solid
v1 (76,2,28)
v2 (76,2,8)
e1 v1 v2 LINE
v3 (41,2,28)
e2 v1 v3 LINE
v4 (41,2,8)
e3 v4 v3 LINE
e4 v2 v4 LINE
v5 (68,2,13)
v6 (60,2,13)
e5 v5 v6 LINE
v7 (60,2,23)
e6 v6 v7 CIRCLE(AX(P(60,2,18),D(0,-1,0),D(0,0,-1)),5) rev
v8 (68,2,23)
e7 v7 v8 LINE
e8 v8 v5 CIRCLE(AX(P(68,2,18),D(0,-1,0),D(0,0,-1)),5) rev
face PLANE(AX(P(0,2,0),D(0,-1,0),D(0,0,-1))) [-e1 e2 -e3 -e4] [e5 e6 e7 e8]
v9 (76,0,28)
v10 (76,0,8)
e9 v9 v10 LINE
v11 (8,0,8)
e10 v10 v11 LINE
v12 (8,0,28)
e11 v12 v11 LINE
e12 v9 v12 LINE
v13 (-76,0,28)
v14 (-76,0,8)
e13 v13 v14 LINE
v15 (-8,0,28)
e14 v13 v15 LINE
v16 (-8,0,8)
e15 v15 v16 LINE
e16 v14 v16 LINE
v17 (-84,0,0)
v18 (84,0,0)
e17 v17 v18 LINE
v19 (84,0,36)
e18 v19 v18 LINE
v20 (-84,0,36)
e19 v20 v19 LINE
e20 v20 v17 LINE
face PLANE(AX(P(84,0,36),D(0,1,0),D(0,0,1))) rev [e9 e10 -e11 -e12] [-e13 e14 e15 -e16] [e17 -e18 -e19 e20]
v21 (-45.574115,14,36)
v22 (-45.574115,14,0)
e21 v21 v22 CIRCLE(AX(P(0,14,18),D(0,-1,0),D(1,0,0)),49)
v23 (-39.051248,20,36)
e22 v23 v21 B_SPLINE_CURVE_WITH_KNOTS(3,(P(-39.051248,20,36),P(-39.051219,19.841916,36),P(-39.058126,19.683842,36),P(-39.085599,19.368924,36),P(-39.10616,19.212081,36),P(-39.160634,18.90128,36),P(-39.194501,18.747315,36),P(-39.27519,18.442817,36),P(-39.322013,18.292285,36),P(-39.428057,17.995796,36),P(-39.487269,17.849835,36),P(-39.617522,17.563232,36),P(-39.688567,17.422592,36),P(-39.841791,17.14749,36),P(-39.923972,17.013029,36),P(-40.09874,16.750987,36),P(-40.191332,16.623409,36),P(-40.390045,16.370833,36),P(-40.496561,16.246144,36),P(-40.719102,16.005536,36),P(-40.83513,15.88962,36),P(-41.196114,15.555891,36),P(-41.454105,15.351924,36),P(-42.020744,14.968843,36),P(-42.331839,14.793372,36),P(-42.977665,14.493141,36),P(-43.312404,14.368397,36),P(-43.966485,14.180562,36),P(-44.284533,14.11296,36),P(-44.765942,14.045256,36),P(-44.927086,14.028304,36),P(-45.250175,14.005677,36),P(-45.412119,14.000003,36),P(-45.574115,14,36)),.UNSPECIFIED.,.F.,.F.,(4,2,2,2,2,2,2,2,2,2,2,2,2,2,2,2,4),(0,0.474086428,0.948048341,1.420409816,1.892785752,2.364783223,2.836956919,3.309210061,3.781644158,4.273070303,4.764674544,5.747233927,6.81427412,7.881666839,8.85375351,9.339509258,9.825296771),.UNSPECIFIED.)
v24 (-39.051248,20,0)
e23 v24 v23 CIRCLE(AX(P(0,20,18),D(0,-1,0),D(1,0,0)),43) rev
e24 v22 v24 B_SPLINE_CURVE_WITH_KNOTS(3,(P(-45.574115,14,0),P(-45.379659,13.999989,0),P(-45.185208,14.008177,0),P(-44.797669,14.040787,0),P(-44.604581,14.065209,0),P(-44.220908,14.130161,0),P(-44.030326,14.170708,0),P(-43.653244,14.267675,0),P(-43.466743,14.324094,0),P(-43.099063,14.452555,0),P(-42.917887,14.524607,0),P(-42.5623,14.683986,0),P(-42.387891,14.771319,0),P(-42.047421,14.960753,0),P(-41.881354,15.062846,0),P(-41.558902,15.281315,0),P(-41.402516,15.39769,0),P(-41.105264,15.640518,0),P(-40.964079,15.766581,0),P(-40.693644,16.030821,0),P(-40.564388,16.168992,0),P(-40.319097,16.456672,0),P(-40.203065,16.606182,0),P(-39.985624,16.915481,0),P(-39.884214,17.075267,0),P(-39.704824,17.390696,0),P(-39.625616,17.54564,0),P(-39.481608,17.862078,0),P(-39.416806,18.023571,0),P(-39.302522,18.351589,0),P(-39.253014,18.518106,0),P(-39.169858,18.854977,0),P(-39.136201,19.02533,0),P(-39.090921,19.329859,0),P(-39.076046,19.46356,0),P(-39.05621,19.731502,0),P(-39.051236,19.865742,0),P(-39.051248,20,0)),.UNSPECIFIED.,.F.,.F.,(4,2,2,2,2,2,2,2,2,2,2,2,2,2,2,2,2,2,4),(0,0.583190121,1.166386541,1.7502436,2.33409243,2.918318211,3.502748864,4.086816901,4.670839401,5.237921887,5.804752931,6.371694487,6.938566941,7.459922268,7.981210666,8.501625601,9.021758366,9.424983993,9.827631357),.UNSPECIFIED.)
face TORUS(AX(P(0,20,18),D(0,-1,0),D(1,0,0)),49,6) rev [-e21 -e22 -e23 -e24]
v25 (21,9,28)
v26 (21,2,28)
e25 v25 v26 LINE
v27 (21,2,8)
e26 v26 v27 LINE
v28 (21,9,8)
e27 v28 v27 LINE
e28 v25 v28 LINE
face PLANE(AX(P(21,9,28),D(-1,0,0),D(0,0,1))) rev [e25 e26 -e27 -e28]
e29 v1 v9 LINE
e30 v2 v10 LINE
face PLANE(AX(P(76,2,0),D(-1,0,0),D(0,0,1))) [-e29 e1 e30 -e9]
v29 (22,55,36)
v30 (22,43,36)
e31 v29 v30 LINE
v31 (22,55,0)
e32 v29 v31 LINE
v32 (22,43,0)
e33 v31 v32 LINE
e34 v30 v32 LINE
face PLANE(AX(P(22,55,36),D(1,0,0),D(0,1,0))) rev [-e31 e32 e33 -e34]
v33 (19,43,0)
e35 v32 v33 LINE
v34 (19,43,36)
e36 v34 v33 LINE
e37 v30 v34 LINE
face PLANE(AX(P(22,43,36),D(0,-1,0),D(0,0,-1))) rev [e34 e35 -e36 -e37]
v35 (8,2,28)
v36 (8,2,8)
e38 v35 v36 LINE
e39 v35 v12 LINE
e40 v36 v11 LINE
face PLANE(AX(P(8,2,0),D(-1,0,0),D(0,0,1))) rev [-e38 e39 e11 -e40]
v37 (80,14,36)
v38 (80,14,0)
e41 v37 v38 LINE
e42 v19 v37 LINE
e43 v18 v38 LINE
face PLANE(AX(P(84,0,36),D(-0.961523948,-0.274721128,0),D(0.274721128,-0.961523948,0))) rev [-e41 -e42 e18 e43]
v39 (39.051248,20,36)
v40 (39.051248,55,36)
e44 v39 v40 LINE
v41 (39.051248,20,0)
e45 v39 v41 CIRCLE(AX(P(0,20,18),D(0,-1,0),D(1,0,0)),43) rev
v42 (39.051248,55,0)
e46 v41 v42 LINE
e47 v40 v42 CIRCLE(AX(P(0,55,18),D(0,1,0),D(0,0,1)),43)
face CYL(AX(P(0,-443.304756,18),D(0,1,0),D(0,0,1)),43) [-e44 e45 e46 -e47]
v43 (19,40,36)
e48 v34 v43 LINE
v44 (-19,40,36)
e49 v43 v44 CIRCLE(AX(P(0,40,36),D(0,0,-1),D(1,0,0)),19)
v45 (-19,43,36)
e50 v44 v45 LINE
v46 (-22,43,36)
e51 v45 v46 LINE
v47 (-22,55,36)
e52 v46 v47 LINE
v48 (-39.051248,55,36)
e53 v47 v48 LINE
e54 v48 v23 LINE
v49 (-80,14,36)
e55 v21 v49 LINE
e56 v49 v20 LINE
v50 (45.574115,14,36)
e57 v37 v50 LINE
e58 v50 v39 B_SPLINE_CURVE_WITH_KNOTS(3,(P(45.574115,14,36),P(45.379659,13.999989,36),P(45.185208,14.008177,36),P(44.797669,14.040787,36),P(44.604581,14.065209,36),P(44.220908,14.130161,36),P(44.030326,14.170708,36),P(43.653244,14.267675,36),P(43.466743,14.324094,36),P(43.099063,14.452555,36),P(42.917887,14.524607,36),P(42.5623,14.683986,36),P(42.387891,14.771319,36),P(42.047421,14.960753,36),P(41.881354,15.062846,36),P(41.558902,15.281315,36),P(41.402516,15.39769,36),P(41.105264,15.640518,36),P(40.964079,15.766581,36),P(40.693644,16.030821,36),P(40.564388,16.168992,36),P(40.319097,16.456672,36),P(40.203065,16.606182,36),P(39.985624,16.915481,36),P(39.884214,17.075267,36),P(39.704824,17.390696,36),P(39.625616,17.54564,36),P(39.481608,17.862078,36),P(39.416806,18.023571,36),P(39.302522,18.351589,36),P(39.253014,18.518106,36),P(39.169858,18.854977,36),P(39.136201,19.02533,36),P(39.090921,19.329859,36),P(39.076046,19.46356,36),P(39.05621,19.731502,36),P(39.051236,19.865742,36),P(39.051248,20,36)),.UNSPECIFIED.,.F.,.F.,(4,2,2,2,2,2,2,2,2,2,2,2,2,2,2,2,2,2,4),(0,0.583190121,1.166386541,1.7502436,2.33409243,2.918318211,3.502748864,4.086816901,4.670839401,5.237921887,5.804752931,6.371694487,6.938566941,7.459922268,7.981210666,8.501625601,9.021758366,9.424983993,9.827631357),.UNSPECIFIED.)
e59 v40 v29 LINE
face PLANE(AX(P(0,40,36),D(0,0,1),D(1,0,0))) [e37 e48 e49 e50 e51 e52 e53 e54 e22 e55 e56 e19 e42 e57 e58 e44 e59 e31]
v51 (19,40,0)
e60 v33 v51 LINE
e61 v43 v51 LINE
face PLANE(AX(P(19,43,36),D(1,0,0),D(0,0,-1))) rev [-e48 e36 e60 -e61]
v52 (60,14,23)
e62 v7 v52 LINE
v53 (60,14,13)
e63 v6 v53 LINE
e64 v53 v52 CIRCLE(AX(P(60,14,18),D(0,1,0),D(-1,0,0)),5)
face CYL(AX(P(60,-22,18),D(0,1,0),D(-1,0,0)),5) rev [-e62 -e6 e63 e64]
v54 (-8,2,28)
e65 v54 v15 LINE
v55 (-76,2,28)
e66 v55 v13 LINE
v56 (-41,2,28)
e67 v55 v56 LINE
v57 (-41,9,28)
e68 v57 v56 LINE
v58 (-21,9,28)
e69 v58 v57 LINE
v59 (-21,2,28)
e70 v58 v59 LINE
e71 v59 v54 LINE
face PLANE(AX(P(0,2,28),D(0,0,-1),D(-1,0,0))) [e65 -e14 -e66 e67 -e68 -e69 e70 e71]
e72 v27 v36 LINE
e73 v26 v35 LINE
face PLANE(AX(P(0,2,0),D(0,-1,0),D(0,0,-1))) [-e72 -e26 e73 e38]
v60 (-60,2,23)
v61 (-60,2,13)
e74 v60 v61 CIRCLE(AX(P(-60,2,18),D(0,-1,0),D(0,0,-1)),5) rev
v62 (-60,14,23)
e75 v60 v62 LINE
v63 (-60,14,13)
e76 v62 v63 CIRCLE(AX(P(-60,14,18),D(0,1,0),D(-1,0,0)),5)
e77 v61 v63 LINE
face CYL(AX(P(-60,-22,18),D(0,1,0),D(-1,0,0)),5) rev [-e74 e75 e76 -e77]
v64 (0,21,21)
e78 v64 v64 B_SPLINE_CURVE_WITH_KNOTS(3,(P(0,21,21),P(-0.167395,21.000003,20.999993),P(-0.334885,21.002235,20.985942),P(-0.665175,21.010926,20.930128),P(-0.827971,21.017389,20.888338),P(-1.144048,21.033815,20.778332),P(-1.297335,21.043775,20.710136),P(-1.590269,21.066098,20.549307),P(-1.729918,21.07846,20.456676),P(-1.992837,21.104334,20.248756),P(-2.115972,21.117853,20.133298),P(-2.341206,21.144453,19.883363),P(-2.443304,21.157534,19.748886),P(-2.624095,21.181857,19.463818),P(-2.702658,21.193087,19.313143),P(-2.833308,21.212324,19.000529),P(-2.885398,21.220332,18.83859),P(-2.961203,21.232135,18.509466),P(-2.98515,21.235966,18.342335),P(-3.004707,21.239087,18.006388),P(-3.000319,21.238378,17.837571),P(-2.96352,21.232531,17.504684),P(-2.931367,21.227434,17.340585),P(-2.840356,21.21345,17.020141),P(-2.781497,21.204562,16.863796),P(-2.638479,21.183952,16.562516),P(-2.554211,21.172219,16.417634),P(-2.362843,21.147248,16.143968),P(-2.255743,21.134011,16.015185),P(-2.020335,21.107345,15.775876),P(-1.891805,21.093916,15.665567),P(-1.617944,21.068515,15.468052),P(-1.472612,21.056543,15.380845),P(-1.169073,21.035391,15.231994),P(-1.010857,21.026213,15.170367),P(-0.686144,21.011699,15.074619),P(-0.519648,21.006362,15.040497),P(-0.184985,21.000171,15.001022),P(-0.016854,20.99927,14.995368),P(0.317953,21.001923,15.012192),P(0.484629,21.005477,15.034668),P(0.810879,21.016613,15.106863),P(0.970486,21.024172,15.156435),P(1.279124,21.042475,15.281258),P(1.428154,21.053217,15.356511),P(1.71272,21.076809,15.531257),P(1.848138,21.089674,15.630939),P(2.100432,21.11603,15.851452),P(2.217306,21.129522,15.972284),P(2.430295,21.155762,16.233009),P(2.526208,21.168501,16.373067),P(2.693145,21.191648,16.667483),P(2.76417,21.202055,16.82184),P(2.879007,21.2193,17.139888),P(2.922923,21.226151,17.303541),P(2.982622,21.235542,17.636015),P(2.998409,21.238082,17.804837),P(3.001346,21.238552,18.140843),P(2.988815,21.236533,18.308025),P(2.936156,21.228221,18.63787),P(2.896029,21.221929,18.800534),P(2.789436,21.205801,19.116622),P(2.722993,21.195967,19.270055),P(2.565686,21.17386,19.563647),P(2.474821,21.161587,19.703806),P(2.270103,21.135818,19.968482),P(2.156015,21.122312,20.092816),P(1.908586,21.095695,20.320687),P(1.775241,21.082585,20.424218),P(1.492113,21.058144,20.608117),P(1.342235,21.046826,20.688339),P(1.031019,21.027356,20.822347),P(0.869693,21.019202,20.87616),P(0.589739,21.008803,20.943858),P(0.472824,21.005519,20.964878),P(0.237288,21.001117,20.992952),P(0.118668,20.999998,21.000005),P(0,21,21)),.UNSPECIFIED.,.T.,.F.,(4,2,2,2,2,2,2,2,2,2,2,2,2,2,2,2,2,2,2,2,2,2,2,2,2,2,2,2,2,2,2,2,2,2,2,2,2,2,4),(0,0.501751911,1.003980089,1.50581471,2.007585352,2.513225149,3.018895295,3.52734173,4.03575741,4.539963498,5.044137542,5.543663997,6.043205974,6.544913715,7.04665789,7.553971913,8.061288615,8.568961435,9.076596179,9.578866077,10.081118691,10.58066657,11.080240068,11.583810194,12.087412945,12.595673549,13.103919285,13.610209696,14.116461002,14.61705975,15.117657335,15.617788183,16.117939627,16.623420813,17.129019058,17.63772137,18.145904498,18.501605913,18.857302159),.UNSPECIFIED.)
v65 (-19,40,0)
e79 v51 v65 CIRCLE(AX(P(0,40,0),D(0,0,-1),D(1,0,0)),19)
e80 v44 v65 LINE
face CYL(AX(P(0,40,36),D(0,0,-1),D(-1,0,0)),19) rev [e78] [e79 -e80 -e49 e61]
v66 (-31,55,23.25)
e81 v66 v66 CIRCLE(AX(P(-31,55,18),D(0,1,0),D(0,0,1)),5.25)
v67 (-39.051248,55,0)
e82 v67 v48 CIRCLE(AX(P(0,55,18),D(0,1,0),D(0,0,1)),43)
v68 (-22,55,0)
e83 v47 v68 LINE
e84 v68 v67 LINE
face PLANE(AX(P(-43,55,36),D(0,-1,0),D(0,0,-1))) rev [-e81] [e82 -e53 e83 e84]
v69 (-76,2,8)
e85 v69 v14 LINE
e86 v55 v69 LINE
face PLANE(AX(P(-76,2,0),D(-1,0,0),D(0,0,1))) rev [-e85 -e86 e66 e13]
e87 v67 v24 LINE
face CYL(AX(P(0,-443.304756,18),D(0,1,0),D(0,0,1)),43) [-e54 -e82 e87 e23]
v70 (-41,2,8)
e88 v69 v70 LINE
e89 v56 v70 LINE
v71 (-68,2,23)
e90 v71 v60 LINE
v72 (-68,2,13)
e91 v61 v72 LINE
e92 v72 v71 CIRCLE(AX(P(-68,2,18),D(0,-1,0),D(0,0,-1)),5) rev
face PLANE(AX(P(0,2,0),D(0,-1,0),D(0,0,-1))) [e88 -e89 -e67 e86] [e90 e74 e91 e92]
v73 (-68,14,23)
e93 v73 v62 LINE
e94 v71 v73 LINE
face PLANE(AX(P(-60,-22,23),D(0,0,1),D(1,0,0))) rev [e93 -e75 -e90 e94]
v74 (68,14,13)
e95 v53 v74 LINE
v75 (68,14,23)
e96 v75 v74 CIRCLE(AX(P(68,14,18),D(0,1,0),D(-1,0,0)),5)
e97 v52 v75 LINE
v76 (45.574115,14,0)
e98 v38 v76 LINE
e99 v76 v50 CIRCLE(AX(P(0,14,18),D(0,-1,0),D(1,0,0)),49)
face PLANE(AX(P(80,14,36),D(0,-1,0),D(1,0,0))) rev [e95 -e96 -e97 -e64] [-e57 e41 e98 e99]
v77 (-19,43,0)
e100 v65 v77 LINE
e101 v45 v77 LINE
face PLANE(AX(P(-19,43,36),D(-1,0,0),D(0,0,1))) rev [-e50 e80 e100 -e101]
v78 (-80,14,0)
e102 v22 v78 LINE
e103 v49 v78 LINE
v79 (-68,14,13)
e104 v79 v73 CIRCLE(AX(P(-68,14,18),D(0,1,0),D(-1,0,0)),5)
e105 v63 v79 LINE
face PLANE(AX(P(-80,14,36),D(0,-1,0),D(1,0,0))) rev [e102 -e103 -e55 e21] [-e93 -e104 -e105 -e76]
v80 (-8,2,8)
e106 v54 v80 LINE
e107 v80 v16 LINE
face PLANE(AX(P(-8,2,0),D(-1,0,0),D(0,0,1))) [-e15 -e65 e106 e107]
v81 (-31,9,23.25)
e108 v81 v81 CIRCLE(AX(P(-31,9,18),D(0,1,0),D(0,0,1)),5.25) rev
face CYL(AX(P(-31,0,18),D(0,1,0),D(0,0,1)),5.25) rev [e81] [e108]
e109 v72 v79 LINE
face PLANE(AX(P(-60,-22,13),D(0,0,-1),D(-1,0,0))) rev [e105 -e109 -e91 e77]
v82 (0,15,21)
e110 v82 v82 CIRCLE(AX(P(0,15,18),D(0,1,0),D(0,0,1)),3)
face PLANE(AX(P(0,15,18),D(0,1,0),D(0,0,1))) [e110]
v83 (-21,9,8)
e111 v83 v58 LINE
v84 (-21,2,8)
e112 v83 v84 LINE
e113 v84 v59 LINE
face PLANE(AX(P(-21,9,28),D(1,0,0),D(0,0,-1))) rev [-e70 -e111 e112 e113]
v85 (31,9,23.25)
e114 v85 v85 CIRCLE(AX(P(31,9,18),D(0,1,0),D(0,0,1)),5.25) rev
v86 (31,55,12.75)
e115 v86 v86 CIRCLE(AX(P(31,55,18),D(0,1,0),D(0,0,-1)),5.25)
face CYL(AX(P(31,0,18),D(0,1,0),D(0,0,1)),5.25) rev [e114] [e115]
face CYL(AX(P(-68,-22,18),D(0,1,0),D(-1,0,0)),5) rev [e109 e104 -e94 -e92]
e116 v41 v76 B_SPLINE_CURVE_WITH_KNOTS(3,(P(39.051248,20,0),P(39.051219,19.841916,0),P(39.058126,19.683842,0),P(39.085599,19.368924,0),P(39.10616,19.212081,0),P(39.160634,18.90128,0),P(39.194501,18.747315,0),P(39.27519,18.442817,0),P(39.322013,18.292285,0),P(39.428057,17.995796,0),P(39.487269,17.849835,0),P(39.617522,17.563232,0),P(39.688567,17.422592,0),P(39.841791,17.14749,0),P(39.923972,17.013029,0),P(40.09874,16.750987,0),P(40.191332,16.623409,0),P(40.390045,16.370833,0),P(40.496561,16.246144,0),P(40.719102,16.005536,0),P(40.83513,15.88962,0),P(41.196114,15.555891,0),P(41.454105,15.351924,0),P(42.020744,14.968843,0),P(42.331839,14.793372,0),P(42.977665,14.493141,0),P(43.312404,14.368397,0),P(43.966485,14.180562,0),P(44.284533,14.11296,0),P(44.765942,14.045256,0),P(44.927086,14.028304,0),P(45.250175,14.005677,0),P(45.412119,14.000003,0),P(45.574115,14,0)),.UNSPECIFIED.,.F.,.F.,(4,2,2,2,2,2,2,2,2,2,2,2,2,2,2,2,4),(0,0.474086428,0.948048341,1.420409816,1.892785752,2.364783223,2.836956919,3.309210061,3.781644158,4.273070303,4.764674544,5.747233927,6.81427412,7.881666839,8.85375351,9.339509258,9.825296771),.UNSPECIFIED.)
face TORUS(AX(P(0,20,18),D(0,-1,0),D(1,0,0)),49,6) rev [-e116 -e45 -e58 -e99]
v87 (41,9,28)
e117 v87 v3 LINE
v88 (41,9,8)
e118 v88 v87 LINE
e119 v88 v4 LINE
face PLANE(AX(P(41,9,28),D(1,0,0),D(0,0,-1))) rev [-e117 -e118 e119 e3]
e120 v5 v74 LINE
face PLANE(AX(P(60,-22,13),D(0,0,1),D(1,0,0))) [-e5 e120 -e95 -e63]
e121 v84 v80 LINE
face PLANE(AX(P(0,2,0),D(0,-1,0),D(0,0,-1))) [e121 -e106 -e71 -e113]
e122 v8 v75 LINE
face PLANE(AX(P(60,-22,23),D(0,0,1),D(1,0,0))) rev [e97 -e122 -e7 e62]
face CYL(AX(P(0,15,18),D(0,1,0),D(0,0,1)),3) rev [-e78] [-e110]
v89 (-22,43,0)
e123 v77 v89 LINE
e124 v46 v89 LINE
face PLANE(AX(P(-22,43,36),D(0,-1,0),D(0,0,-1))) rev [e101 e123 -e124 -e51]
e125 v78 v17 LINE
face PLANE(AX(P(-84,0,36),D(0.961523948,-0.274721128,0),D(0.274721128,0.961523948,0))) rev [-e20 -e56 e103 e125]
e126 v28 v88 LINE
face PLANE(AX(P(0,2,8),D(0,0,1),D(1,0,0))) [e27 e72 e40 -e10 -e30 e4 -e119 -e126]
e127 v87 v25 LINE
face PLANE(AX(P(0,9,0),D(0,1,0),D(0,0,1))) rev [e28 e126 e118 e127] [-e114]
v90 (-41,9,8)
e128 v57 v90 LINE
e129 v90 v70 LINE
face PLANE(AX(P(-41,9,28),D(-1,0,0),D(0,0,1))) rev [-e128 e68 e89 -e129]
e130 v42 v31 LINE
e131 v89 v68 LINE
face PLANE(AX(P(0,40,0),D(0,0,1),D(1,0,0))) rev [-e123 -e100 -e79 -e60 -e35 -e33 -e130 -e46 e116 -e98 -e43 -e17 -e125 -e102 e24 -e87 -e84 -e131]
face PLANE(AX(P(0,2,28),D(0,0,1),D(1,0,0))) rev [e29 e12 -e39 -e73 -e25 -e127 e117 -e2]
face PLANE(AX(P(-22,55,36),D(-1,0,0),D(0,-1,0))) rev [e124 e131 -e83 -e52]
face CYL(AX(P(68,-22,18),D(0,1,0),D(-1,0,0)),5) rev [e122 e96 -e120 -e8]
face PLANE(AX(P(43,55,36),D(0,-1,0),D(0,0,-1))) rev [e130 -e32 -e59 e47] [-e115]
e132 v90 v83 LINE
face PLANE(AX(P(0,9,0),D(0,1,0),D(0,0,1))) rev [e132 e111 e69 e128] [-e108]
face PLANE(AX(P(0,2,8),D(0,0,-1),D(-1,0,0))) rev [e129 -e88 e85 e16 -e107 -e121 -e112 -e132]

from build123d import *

# Parameters (mm, degrees)
BOSS_EXTRUDE1_DEPTH = 36
CUT_EXTRUDE1_DEPTH  = 36
CUT_EXTRUDE2_DEPTH  = 36
SKETCH5_R           = 5.25
CUT_EXTRUDE3_DEPTH  = 107.663020771
CUT_EXTRUDE4_START  = -2
SKETCH6_W           = 68
SKETCH6_H           = 20
SKETCH6_R           = 5.25
CUT_EXTRUDE4_DEPTH  = 2
CUT_EXTRUDE5_START  = -41
CUT_EXTRUDE5_DEPTH  = 41
SKETCH9_R           = 3
CUT_EXTRUDE15_DEPTH = 6
FILLET1_R           = 6
FILLET2_R           = 6
SKETCH11_W          = 20
SKETCH11_H          = 20
CUT_EXTRUDE19_DEPTH = 7
SKETCH13_W          = 20
SKETCH13_H          = 20
CUT_EXTRUDE20_DEPTH = 7


# Read off the part's stored shape, not the designer's step: Cut-Extrude5
with BuildPart() as part:
    # Sketch1 → Boss-Extrude1 (new body)
    with BuildSketch(Plane.XY):
        with BuildLine():
            Line((84, 0), (-84, 0))
            Line((-84, 0), (-80, 14))
            Line((-80, 14), (-43, 14))
            Line((-43, 14), (-43, 55))
            Line((-43, 55), (-22, 55))
            Line((-22, 55), (-22, 43))
            Line((-22, 43), (-19, 43))
            Line((-19, 43), (-19, 40))
            ThreePointArc((-19, 40), (0, 21), (19, 40))
            Line((19, 40), (19, 43))
            Line((19, 43), (22, 43))
            Line((22, 43), (22, 55))
            Line((22, 55), (43, 55))
            Line((43, 55), (43, 14))
            Line((43, 14), (80, 14))
            Line((80, 14), (84, 0))
        make_face()
    extrude(amount=BOSS_EXTRUDE1_DEPTH)

    # Sketch2 → Cut-Extrude1 (cut)
    with BuildSketch(Plane(origin=(0, 14, 0), x_dir=(1, 0, 0), z_dir=(0, 1, 0))):
        with BuildLine():
            Line((60, -13), (68, -13))
            ThreePointArc((68, -13), (73, -18), (68, -23))
            Line((68, -23), (60, -23))
            ThreePointArc((60, -23), (55, -18), (60, -13))
        make_face()
    extrude(amount=-CUT_EXTRUDE1_DEPTH, mode=Mode.SUBTRACT)

    # Sketch4 → Cut-Extrude2 (cut)
    with BuildSketch(Plane(origin=(0, 14, 0), x_dir=(1, 0, 0), z_dir=(0, 1, 0))):
        with BuildLine():
            Line((-60, -23), (-68, -23))
            ThreePointArc((-68, -23), (-73, -18), (-68, -13))
            Line((-68, -13), (-60, -13))
            ThreePointArc((-60, -13), (-55, -18), (-60, -23))
        make_face()
    extrude(amount=-CUT_EXTRUDE2_DEPTH, mode=Mode.SUBTRACT)

    # Sketch5 → Cut-Extrude3 (cut, through all)
    with BuildSketch(Plane(origin=(0, 55, 0), x_dir=(1, 0, 0), z_dir=(0, 1, 0))):
        with Locations(Location((-31, -18, 0), (0, 0, 270))):
            Circle(SKETCH5_R)
        with Locations(Location((31, -18, 0), (0, 0, 90))):
            Circle(SKETCH5_R)
    extrude(amount=-CUT_EXTRUDE3_DEPTH, mode=Mode.SUBTRACT)

    # Sketch6 → Cut-Extrude4 (cut)
    # profile 1 of 2: a face of its own
    with BuildSketch(Plane.XZ.offset(CUT_EXTRUDE4_START)):
        with Locations((-42, 18)):
            Rectangle(SKETCH6_W, SKETCH6_H)
        with Locations(Location((-31, 18, 0), (0, 0, 90))):
            Circle(SKETCH6_R, mode=Mode.SUBTRACT)
        with BuildLine():
            ThreePointArc((-68, 13), (-73, 18), (-68, 23))
            Line((-68, 23), (-60, 23))
            ThreePointArc((-60, 23), (-55, 18), (-60, 13))
            Line((-60, 13), (-68, 13))
        make_face(mode=Mode.SUBTRACT)
    # profile 2 of 2: a face of its own
    with BuildSketch(Plane.XZ.offset(CUT_EXTRUDE4_START)):
        with Locations((42, 18)):
            Rectangle(SKETCH6_W, SKETCH6_H)
        with Locations(Location((31, 18, 0), (0, 0, 270))):
            Circle(SKETCH6_R, mode=Mode.SUBTRACT)
        with BuildLine():
            ThreePointArc((68, 23), (73, 18), (68, 13))
            Line((68, 13), (60, 13))
            ThreePointArc((60, 13), (55, 18), (60, 23))
            Line((60, 23), (68, 23))
        make_face(mode=Mode.SUBTRACT)
    extrude(amount=CUT_EXTRUDE4_DEPTH, mode=Mode.SUBTRACT)

    # Cut-Extrude5 outline → Cut-Extrude5 (cut)
    with BuildSketch(Plane(origin=(0, 55, 0), x_dir=(1, 0, 0), z_dir=(0, 1, 0)).offset(CUT_EXTRUDE5_START)):
        with BuildLine():
            ThreePointArc((43, -18), (42.001212365, -27.214019744), (39.05124838, -36))
            Line((39.05124838, -36), (43, -36))
            Line((43, -36), (43, -18))
        make_face()
        with BuildLine():
            ThreePointArc((39.05124838, 0), (42.001212365, -8.785980256), (43, -18))
            Line((43, -18), (43, 0))
            Line((43, 0), (39.05124838, 0))
        make_face()
        with BuildLine():
            Line((-43, -36), (-39.05124838, -36))
            ThreePointArc((-39.05124838, -36), (-42.001212365, -27.214019744), (-43, -18))
            Line((-43, -18), (-43, -36))
        make_face()
        with BuildLine():
            Line((-43, 0), (-43, -18))
            ThreePointArc((-43, -18), (-42.001212365, -8.785980256), (-39.05124838, 0))
            Line((-39.05124838, 0), (-43, 0))
        make_face()
    extrude(amount=CUT_EXTRUDE5_DEPTH, mode=Mode.SUBTRACT)

    # Sketch9 → Cut-Extrude15 (cut, symmetric)
    with BuildSketch(Plane(origin=(0, 21, 0), x_dir=(1, 0, 0), z_dir=(0, 1, 0))):
        with Locations(Location((0, -18, 0), (0, 0, 270))):
            Circle(SKETCH9_R)
    extrude(amount=CUT_EXTRUDE15_DEPTH, both=True, mode=Mode.SUBTRACT)

    # Fillet1
    fillet1_edges = [part.edges().sort_by_distance(p)[0] for p in [
        (42.001212365, 14, 27.214019744),
    ]]
    fillet(fillet1_edges, radius=FILLET1_R)

    # Fillet2
    fillet2_edges = [part.edges().sort_by_distance(p)[0] for p in [
        (-42.001212365, 14, 27.214019744),
    ]]
    fillet(fillet2_edges, radius=FILLET2_R)

    # Sketch11 → Cut-Extrude19 (cut)
    with BuildSketch(Plane.XZ.offset(-2)):
        with Locations((-31, 18)):
            Rectangle(SKETCH11_W, SKETCH11_H)
    extrude(amount=-CUT_EXTRUDE19_DEPTH, mode=Mode.SUBTRACT)

    # Sketch13 → Cut-Extrude20 (cut)
    with BuildSketch(Plane.XZ.offset(-2)):
        with Locations((31, 18)):
            Rectangle(SKETCH13_W, SKETCH13_H)
    extrude(amount=-CUT_EXTRUDE20_DEPTH, mode=Mode.SUBTRACT)


solid = part.part
